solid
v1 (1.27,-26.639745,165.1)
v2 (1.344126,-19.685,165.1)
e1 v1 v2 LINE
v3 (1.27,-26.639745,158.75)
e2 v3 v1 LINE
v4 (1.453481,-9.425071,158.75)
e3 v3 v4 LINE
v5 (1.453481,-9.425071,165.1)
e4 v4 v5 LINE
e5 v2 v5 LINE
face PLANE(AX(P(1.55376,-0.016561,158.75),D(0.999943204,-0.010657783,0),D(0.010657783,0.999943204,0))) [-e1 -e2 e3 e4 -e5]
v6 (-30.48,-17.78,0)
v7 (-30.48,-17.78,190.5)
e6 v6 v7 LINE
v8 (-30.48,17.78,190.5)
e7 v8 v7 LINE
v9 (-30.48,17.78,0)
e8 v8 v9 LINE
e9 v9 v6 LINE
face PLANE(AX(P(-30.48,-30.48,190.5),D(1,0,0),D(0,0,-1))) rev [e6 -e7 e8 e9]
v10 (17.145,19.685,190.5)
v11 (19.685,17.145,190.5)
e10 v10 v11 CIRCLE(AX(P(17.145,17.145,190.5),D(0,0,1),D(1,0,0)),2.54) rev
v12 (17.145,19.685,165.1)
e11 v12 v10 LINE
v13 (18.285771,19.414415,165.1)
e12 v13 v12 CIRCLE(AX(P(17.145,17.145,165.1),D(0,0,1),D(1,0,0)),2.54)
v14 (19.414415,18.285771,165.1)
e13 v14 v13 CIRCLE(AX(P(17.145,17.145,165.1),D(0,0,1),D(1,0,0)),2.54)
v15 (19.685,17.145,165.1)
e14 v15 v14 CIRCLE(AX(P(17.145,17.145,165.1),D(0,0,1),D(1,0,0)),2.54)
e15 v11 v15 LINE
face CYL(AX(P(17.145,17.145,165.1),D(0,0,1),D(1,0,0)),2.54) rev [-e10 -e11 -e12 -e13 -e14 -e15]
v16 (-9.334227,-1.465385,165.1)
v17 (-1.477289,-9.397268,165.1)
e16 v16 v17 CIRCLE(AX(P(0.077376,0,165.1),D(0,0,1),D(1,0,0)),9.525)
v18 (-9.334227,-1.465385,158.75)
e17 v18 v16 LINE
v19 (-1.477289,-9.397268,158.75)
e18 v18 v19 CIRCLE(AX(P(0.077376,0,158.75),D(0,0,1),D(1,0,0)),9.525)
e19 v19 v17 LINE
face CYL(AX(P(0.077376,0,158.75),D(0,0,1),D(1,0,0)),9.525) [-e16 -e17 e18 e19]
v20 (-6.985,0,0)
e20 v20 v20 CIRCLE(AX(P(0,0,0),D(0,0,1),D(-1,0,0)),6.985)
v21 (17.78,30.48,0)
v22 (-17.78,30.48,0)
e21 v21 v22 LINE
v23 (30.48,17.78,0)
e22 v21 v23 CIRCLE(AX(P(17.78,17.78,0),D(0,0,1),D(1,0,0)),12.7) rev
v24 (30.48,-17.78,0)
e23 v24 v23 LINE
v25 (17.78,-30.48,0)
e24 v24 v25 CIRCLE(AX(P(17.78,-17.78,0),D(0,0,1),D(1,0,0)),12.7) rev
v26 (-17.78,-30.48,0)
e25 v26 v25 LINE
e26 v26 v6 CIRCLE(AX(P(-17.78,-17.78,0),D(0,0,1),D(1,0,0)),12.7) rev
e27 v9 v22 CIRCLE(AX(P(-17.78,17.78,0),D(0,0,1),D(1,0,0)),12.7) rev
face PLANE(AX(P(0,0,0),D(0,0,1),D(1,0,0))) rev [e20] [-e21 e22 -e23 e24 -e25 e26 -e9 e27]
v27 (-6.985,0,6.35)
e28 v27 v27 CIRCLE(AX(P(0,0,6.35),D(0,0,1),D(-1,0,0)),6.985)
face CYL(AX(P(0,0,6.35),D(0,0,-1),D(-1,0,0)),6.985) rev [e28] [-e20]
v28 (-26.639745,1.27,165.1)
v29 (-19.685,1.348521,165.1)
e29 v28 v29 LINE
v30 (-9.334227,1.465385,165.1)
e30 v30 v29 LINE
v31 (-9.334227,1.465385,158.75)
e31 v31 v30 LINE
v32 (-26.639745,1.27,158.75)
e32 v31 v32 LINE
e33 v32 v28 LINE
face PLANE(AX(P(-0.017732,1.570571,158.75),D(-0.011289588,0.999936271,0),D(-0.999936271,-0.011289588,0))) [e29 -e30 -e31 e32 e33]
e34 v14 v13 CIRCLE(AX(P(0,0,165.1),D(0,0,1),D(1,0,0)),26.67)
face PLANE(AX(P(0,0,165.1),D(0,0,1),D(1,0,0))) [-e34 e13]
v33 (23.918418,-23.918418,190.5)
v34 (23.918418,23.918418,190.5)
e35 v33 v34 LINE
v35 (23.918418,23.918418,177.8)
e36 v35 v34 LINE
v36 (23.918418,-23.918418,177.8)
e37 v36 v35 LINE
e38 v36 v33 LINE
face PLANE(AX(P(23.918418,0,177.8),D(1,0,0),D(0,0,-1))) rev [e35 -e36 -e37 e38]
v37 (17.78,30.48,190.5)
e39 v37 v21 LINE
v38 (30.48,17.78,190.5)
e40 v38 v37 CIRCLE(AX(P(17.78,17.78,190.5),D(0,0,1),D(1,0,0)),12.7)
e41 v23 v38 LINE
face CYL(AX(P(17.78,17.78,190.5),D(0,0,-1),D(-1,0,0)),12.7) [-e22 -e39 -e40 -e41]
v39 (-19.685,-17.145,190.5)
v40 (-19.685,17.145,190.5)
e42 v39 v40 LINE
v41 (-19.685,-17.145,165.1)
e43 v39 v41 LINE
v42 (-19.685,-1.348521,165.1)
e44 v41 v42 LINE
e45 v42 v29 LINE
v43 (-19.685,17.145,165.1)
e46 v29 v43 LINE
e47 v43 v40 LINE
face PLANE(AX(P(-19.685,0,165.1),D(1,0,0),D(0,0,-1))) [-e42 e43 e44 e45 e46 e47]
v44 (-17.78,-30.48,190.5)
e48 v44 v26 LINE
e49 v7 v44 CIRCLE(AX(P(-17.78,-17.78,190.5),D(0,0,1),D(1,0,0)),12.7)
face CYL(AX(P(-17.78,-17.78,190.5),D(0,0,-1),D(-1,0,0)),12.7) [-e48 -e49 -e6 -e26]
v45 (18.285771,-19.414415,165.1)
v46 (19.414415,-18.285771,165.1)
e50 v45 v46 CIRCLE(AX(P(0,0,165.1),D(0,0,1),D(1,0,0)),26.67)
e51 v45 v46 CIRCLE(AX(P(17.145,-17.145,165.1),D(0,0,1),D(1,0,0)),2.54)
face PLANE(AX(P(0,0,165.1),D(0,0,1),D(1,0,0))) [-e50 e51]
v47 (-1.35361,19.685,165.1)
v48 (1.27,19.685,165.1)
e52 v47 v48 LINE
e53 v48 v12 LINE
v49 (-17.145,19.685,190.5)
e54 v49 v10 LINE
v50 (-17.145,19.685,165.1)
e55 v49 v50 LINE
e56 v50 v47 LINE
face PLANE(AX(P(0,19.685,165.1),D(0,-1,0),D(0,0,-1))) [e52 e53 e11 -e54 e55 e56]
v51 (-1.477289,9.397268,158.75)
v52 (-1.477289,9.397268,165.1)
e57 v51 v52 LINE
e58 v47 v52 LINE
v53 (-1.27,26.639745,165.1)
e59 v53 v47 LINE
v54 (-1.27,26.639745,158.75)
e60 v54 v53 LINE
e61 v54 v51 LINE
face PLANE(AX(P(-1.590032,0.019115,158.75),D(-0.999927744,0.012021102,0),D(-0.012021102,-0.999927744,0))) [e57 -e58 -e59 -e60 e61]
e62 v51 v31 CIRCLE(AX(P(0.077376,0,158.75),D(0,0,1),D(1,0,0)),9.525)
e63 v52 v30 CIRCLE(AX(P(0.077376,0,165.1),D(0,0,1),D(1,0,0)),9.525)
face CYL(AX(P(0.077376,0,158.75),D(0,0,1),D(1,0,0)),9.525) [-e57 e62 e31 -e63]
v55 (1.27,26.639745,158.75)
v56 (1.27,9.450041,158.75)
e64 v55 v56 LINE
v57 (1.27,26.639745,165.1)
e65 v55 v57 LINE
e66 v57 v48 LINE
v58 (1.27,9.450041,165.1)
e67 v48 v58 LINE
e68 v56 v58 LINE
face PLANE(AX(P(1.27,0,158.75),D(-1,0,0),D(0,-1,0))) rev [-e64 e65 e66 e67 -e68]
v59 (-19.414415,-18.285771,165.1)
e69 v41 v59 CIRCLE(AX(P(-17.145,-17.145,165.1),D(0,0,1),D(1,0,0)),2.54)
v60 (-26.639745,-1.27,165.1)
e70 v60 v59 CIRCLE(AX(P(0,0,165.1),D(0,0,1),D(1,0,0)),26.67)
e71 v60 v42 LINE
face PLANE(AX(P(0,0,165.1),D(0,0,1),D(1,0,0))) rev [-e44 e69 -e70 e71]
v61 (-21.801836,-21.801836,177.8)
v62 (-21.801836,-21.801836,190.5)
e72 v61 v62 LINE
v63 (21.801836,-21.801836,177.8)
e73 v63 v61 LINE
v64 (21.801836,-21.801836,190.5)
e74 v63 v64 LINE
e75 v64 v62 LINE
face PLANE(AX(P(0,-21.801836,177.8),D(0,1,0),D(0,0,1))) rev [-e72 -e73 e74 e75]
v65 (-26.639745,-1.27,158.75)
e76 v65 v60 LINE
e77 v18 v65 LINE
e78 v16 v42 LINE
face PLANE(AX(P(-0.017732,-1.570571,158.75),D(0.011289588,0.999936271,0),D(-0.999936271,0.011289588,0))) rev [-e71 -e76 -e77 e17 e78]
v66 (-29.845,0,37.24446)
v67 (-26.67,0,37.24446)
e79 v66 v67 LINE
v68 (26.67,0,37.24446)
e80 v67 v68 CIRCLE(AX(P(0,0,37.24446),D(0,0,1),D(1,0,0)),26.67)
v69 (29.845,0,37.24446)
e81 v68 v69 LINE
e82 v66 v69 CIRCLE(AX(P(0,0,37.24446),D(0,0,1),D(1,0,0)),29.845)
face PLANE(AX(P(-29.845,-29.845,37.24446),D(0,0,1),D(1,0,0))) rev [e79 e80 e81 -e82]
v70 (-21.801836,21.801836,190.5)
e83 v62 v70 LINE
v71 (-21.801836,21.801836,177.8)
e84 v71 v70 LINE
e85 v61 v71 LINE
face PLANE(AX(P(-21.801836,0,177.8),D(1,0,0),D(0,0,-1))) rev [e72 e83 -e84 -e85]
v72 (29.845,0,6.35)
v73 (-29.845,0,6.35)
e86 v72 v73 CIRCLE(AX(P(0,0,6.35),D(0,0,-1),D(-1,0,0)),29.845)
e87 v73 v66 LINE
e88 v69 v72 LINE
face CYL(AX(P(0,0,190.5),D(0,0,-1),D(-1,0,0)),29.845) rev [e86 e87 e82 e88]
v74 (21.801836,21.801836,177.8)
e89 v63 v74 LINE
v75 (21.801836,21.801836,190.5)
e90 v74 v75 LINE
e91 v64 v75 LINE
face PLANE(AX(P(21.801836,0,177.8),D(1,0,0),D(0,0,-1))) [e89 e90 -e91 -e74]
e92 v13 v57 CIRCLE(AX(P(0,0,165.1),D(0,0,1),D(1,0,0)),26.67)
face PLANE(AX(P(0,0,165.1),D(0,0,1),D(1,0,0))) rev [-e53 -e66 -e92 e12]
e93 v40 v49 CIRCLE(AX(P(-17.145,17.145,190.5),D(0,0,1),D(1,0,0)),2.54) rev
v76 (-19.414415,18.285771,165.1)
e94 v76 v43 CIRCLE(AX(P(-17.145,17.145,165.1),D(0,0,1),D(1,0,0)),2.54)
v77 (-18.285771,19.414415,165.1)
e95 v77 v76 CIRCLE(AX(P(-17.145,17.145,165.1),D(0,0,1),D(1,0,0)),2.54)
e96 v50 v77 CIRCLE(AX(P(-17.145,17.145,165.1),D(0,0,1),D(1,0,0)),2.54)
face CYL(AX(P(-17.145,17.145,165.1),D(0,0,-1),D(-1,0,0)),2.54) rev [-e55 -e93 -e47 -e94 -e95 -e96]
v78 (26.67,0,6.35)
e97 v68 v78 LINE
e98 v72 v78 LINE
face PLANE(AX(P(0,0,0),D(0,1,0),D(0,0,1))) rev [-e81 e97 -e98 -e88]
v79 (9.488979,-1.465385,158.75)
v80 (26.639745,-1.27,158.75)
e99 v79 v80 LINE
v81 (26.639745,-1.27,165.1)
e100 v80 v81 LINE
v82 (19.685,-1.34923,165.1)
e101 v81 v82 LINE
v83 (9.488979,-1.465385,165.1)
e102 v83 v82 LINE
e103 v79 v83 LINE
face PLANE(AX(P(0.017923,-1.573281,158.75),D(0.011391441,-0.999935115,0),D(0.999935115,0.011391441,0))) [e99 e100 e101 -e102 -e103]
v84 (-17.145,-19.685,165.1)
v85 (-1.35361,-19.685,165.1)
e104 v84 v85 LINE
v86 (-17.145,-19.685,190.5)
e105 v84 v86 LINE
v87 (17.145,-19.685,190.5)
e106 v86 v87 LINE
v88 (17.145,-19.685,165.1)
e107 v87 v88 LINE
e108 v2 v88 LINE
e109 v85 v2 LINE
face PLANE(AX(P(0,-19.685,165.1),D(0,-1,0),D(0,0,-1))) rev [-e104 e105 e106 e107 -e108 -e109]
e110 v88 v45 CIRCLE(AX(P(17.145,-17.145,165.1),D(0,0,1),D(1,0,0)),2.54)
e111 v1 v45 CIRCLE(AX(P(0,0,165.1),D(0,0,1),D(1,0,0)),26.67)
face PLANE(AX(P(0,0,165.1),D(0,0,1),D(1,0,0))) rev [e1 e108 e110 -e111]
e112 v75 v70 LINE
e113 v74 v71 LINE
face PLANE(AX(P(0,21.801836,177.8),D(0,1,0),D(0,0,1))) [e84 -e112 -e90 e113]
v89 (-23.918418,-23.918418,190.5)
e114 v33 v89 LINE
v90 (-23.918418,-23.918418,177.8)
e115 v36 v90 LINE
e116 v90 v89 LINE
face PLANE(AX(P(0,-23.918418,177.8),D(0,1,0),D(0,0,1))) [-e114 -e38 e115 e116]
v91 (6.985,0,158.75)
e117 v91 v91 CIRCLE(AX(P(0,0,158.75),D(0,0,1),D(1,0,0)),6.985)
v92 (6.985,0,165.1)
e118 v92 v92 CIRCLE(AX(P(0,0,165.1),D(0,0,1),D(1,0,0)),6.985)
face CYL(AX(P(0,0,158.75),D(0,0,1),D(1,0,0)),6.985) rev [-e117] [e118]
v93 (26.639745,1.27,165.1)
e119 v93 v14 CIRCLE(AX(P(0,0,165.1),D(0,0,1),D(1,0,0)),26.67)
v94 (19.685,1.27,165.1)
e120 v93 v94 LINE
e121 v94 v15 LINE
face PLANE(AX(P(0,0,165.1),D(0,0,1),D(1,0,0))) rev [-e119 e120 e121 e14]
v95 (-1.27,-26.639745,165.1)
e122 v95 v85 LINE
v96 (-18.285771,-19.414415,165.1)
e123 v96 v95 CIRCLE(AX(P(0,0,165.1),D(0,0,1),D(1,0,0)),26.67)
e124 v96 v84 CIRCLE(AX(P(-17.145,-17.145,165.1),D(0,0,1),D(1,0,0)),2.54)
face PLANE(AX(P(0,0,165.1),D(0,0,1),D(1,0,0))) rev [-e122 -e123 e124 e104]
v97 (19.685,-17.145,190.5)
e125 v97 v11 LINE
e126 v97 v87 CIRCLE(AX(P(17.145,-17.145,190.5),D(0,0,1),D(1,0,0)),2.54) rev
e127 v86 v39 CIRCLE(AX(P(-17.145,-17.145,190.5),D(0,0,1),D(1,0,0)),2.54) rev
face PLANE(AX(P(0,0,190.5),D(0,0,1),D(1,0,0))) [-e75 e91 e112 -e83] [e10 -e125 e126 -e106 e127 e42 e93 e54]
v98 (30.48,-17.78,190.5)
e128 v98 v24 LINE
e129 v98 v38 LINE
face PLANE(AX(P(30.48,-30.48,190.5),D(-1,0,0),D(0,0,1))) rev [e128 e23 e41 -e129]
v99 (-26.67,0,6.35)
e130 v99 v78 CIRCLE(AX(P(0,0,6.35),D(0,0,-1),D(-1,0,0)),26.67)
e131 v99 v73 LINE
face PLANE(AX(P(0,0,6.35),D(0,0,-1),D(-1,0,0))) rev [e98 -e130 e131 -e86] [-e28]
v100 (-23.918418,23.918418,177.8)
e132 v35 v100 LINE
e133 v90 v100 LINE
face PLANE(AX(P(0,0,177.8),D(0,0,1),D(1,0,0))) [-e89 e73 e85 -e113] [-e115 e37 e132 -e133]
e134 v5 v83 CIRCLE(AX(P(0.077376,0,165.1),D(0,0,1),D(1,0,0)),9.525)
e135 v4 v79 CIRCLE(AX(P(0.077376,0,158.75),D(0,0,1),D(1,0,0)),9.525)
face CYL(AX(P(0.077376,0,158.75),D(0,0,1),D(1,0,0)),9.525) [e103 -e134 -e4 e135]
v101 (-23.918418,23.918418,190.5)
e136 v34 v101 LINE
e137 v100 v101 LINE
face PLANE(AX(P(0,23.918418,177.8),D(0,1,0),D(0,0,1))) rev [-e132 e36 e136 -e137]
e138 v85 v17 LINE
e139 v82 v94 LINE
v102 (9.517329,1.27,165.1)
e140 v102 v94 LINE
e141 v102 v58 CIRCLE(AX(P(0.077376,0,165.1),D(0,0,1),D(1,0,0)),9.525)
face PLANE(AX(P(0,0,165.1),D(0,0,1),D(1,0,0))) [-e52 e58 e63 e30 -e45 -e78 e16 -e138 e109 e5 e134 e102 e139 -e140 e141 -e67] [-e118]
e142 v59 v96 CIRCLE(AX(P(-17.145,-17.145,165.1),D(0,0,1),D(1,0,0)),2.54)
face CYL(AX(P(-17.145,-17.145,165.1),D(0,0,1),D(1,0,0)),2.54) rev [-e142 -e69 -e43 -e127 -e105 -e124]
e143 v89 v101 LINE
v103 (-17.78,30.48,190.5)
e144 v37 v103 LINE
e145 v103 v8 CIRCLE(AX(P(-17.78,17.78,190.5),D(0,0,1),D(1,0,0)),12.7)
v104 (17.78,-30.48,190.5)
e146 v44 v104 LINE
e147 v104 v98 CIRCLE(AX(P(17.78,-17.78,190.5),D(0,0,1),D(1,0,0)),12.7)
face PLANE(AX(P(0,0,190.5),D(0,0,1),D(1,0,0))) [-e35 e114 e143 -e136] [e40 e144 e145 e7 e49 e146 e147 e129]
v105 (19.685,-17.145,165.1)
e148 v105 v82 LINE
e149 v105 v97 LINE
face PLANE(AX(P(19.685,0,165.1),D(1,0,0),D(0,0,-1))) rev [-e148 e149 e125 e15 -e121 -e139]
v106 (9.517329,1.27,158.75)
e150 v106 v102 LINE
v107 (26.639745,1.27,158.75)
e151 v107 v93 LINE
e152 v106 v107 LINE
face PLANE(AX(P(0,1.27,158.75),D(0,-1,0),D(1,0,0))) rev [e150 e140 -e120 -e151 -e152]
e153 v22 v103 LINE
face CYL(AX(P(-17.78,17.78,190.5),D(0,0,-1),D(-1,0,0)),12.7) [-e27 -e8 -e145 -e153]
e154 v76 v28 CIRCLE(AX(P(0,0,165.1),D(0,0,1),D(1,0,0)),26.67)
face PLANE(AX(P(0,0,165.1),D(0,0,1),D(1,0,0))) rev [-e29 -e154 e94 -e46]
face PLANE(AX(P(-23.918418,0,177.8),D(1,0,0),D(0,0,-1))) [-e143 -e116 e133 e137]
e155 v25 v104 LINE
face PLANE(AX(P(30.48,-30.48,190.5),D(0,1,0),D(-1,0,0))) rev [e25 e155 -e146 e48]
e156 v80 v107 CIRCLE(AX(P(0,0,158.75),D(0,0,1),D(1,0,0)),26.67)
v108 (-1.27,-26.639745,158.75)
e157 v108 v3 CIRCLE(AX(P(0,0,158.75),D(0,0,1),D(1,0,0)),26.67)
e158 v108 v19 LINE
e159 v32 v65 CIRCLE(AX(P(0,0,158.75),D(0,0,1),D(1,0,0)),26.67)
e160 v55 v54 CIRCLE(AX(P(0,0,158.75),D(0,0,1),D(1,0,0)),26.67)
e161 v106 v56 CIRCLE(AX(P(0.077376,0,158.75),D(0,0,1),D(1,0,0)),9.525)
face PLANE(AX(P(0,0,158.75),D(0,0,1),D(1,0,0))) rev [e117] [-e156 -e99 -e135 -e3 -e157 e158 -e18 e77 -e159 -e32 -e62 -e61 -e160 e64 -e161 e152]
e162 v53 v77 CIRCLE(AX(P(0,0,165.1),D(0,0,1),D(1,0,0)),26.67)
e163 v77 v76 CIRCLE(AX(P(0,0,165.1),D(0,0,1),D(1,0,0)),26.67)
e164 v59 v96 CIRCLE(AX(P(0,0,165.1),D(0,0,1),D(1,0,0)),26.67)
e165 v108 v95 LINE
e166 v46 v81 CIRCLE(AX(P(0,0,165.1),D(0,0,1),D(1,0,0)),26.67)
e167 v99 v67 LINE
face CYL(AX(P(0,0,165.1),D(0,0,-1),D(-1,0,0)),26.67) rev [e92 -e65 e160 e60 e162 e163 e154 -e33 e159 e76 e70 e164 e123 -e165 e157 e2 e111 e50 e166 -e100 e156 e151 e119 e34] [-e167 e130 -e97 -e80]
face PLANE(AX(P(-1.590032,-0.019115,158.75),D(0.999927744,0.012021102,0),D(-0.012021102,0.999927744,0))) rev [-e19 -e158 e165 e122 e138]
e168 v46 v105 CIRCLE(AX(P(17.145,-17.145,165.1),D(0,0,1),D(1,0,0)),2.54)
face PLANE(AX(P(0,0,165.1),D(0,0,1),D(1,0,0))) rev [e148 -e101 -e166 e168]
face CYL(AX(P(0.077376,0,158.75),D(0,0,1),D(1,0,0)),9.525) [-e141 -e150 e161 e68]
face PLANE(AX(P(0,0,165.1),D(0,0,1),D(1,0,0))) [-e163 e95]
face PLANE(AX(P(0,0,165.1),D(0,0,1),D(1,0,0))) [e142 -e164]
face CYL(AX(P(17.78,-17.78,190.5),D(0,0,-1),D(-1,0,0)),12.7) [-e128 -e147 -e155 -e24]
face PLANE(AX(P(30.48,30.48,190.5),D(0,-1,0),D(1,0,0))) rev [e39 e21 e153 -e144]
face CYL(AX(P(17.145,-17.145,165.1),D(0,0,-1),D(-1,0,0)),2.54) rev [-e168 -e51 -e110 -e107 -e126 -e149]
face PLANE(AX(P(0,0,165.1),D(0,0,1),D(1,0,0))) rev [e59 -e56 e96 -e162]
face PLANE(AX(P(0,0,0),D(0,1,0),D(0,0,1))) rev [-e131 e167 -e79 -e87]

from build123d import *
from build123d.topology import SkipClean

# Parameters (mm, degrees)
SKETCH1_R           = 29.845
SKETCH1_R_2         = 26.67
BOSS_EXTRUDE1_DEPTH = 165.1
SKETCH2_W           = 59.69
SKETCH2_H           = 38.1
CUT_EXTRUDE1_DEPTH  = 171.409677102
BOSS_EXTRUDE2_DEPTH = 6.35
SKETCH5_R           = 29.845
SKETCH5_R_2         = 6.985
BOSS_EXTRUDE4_DEPTH = 6.35
BOSS_EXTRUDE5_START = -6.35
SKETCH4_R           = 29.845
SKETCH4_R_2         = 26.67
SKETCH4_R_3         = 6.985
BOSS_EXTRUDE5_DEPTH = 6.35
SKETCH6_W           = 60.96
SKETCH6_H           = 60.96
SKETCH6_R           = 29.845
BOSS_EXTRUDE7_DEPTH = 190.5
BOSS_EXTRUDE8_START = -25.4
SKETCH7_W           = 60.96
SKETCH7_H           = 60.96
SKETCH7_R           = 29.845
SKETCH7_W_2         = 39.37
SKETCH7_H_2         = 39.37
BOSS_EXTRUDE8_DEPTH = 25.4
SKETCH8_W           = 47.836836
SKETCH8_H           = 47.836836
SKETCH8_W_2         = 43.603672
SKETCH8_H_2         = 43.603672
CUT_EXTRUDE2_DEPTH  = 12.7
FILLET1_R           = 2.54
FILLET2_R           = 12.7


with BuildPart() as part:
    # Sketch1 → Boss-Extrude1 (new body)
    with BuildSketch(Plane.XY):
        Circle(SKETCH1_R)
        Circle(SKETCH1_R_2, mode=Mode.SUBTRACT)
    extrude(amount=BOSS_EXTRUDE1_DEPTH)

    # Sketch2 → Cut-Extrude1 (cut, through all)
    with BuildSketch(Plane(origin=(0, 0, 0), x_dir=(1, 0, 0), z_dir=(0, 1, 0))):
        with Locations((0, -18.194460122)):
            Rectangle(SKETCH2_W, SKETCH2_H)
    extrude(amount=-CUT_EXTRUDE1_DEPTH, mode=Mode.SUBTRACT)

    # Sketch3 → Boss-Extrude2 (add)
    with BuildSketch(Plane(origin=(0, 0, 0), x_dir=(-1, 0, 0), z_dir=(0, 0, -1))):
        with BuildLine():
            Line((-29.845, 0), (-6.985, 0))
            ThreePointArc((-6.985, 0), (0, 6.985), (6.985, 0))
            Line((6.985, 0), (29.845, 0))
            ThreePointArc((29.845, 0), (0, 29.845), (-29.845, 0))
        make_face()
    extrude(amount=-BOSS_EXTRUDE2_DEPTH)

    # Sketch5 → Boss-Extrude4 (add)
    with SkipClean():  # the faces are left unmerged after this step: merging them gives an invalid solid
        with BuildSketch(Plane(origin=(0, 0, 0), x_dir=(-1, 0, 0), z_dir=(0, 0, -1))):
            with Locations(Location((0, 0, 0), (0, 0, 180))):
                Circle(SKETCH5_R)
            with BuildLine():
                Line((26.639744744, 1.27), (9.33422749, 1.465384615))
                ThreePointArc((9.33422749, 1.465384615), (6.689709997, 6.703146826), (1.477288556, 9.397267918))
                Line((1.477288556, 9.397267918), (1.27, 26.639744744))
                ThreePointArc((1.27, 26.639744744), (18.858537854, 18.858537854), (26.639744744, 1.27))
            make_face(mode=Mode.SUBTRACT)
            with BuildLine():
                Line((-1.27, 26.639744744), (-1.27, 9.45004085))
                ThreePointArc((-1.27, 9.45004085), (-6.784923303, 6.762723487), (-9.517329266, 1.27))
                Line((-9.517329266, 1.27), (-26.639744744, 1.27))
                ThreePointArc((-26.639744744, 1.27), (-18.858537854, 18.858537854), (-1.27, 26.639744744))
            make_face(mode=Mode.SUBTRACT)
            Circle(SKETCH5_R_2, mode=Mode.SUBTRACT)
        extrude(amount=-BOSS_EXTRUDE4_DEPTH)

    # Sketch4 → Boss-Extrude5 (add)
    # profile 1 of 2: a face of its own
    with SkipClean():  # the faces are left unmerged after this step: merging them gives an invalid solid
        with BuildSketch(Plane.XY.offset(165.1).offset(BOSS_EXTRUDE5_START)):
            Circle(SKETCH4_R)
            with Locations(Location((0, 0, 0), (0, 0, 180))):
                Circle(SKETCH4_R_2, mode=Mode.SUBTRACT)
        # profile 2 of 2: a face of its own
        with BuildSketch(Plane.XY.offset(165.1).offset(BOSS_EXTRUDE5_START)):
            with BuildLine():
                Line((1.27, 9.45004085), (1.27, 26.639744744))
                ThreePointArc((1.27, 26.639744744), (0, 26.67), (-1.27, 26.639744744))
                Line((-1.27, 26.639744744), (-1.477288556, 9.397267918))
                ThreePointArc((-1.477288556, 9.397267918), (-6.689709997, 6.703146826), (-9.33422749, 1.465384615))
                Line((-9.33422749, 1.465384615), (-26.639744744, 1.27))
                ThreePointArc((-26.639744744, 1.27), (-26.67, 0), (-26.639744744, -1.27))
                Line((-26.639744744, -1.27), (-9.33422749, -1.465384615))
                ThreePointArc((-9.33422749, -1.465384615), (-6.689709997, -6.703146826), (-1.477288556, -9.397267918))
                Line((-1.477288556, -9.397267918), (-1.27, -26.639744744))
                ThreePointArc((-1.27, -26.639744744), (0, -26.67), (1.27, -26.639744744))
                Line((1.27, -26.639744744), (1.453480675, -9.425070814))
                ThreePointArc((1.453480675, -9.425070814), (6.780569847, -6.767038646), (9.488978712, -1.465384615))
                Line((9.488978712, -1.465384615), (26.639744744, -1.27))
                ThreePointArc((26.639744744, -1.27), (26.662435113, -0.635180167), (26.67, 0))
                ThreePointArc((26.67, 0), (26.662435113, 0.635180167), (26.639744744, 1.27))
                Line((26.639744744, 1.27), (9.517329266, 1.27))
                ThreePointArc((9.517329266, 1.27), (6.784923303, 6.762723487), (1.27, 9.45004085))
            make_face()
            with Locations(Location((0, 0, 0), (0, 0, 180))):
                Circle(SKETCH4_R_3, mode=Mode.SUBTRACT)
        extrude(amount=BOSS_EXTRUDE5_DEPTH)

    # Sketch6 → Boss-Extrude7 (add)
    with BuildSketch(Plane.XY):
        Rectangle(SKETCH6_W, SKETCH6_H)
        Circle(SKETCH6_R, mode=Mode.SUBTRACT)
    extrude(amount=BOSS_EXTRUDE7_DEPTH)

    # Sketch7 → Boss-Extrude8 (add)
    # profile 1 of 2: a face of its own
    with BuildSketch(Plane.XY.offset(190.5).offset(BOSS_EXTRUDE8_START)):
        Rectangle(SKETCH7_W, SKETCH7_H)
        Circle(SKETCH7_R, mode=Mode.SUBTRACT)
    # profile 2 of 2: a face of its own
    with BuildSketch(Plane.XY.offset(190.5).offset(BOSS_EXTRUDE8_START)):
        Circle(SKETCH7_R)
        Rectangle(SKETCH7_W_2, SKETCH7_H_2, mode=Mode.SUBTRACT)
    extrude(amount=BOSS_EXTRUDE8_DEPTH)

    # Sketch8 → Cut-Extrude2 (cut)
    with BuildSketch(Plane.XY.offset(190.5)):
        Rectangle(SKETCH8_W, SKETCH8_H)
        Rectangle(SKETCH8_W_2, SKETCH8_H_2, mode=Mode.SUBTRACT)
    extrude(amount=-CUT_EXTRUDE2_DEPTH, mode=Mode.SUBTRACT)

    # Fillet1
    # the kernel refuses this fillet: 2.54 mm, written as the material it adds along each edge
    with BuildSketch(Plane(origin=(19.685, -19.685, 165.1), x_dir=(-1, 0, 0), z_dir=(0, 0, 1)), Plane(origin=(19.685, 19.685, 165.1), x_dir=(0, -1, 0), z_dir=(0, 0, 1)), Plane(origin=(-19.685, -19.685, 165.1), x_dir=(0, 1, 0), z_dir=(0, 0, 1))) as fillet1_piece_1:
        with BuildLine():
            CenterArc((FILLET1_R, -FILLET1_R), FILLET1_R, 90, 90)
            Line((0, -FILLET1_R), (0, 0))
            Line((0, 0), (FILLET1_R, 0))
        make_face()
    extrude(amount=25.4)
    with BuildSketch(Plane(origin=(-19.685, 19.685, 165.1), x_dir=(0, -1, 0), z_dir=(0, 0, 1))) as fillet1_piece_2:
        with BuildLine():
            CenterArc((FILLET1_R, FILLET1_R), FILLET1_R, 180, 90)
            Line((0, FILLET1_R), (0, 0))
            Line((0, 0), (FILLET1_R, 0))
        make_face()
    extrude(amount=25.4)

    # Fillet2
    fillet2_edges = [part.edges().sort_by_distance(p)[0] for p in [
        (-30.48, 30.48, 95.25),
        (-30.48, -30.48, 95.25),
        (30.48, -30.48, 95.25),
        (30.48, 30.48, 95.25),
    ]]
    fillet(fillet2_edges, radius=FILLET2_R)


solid = part.part
